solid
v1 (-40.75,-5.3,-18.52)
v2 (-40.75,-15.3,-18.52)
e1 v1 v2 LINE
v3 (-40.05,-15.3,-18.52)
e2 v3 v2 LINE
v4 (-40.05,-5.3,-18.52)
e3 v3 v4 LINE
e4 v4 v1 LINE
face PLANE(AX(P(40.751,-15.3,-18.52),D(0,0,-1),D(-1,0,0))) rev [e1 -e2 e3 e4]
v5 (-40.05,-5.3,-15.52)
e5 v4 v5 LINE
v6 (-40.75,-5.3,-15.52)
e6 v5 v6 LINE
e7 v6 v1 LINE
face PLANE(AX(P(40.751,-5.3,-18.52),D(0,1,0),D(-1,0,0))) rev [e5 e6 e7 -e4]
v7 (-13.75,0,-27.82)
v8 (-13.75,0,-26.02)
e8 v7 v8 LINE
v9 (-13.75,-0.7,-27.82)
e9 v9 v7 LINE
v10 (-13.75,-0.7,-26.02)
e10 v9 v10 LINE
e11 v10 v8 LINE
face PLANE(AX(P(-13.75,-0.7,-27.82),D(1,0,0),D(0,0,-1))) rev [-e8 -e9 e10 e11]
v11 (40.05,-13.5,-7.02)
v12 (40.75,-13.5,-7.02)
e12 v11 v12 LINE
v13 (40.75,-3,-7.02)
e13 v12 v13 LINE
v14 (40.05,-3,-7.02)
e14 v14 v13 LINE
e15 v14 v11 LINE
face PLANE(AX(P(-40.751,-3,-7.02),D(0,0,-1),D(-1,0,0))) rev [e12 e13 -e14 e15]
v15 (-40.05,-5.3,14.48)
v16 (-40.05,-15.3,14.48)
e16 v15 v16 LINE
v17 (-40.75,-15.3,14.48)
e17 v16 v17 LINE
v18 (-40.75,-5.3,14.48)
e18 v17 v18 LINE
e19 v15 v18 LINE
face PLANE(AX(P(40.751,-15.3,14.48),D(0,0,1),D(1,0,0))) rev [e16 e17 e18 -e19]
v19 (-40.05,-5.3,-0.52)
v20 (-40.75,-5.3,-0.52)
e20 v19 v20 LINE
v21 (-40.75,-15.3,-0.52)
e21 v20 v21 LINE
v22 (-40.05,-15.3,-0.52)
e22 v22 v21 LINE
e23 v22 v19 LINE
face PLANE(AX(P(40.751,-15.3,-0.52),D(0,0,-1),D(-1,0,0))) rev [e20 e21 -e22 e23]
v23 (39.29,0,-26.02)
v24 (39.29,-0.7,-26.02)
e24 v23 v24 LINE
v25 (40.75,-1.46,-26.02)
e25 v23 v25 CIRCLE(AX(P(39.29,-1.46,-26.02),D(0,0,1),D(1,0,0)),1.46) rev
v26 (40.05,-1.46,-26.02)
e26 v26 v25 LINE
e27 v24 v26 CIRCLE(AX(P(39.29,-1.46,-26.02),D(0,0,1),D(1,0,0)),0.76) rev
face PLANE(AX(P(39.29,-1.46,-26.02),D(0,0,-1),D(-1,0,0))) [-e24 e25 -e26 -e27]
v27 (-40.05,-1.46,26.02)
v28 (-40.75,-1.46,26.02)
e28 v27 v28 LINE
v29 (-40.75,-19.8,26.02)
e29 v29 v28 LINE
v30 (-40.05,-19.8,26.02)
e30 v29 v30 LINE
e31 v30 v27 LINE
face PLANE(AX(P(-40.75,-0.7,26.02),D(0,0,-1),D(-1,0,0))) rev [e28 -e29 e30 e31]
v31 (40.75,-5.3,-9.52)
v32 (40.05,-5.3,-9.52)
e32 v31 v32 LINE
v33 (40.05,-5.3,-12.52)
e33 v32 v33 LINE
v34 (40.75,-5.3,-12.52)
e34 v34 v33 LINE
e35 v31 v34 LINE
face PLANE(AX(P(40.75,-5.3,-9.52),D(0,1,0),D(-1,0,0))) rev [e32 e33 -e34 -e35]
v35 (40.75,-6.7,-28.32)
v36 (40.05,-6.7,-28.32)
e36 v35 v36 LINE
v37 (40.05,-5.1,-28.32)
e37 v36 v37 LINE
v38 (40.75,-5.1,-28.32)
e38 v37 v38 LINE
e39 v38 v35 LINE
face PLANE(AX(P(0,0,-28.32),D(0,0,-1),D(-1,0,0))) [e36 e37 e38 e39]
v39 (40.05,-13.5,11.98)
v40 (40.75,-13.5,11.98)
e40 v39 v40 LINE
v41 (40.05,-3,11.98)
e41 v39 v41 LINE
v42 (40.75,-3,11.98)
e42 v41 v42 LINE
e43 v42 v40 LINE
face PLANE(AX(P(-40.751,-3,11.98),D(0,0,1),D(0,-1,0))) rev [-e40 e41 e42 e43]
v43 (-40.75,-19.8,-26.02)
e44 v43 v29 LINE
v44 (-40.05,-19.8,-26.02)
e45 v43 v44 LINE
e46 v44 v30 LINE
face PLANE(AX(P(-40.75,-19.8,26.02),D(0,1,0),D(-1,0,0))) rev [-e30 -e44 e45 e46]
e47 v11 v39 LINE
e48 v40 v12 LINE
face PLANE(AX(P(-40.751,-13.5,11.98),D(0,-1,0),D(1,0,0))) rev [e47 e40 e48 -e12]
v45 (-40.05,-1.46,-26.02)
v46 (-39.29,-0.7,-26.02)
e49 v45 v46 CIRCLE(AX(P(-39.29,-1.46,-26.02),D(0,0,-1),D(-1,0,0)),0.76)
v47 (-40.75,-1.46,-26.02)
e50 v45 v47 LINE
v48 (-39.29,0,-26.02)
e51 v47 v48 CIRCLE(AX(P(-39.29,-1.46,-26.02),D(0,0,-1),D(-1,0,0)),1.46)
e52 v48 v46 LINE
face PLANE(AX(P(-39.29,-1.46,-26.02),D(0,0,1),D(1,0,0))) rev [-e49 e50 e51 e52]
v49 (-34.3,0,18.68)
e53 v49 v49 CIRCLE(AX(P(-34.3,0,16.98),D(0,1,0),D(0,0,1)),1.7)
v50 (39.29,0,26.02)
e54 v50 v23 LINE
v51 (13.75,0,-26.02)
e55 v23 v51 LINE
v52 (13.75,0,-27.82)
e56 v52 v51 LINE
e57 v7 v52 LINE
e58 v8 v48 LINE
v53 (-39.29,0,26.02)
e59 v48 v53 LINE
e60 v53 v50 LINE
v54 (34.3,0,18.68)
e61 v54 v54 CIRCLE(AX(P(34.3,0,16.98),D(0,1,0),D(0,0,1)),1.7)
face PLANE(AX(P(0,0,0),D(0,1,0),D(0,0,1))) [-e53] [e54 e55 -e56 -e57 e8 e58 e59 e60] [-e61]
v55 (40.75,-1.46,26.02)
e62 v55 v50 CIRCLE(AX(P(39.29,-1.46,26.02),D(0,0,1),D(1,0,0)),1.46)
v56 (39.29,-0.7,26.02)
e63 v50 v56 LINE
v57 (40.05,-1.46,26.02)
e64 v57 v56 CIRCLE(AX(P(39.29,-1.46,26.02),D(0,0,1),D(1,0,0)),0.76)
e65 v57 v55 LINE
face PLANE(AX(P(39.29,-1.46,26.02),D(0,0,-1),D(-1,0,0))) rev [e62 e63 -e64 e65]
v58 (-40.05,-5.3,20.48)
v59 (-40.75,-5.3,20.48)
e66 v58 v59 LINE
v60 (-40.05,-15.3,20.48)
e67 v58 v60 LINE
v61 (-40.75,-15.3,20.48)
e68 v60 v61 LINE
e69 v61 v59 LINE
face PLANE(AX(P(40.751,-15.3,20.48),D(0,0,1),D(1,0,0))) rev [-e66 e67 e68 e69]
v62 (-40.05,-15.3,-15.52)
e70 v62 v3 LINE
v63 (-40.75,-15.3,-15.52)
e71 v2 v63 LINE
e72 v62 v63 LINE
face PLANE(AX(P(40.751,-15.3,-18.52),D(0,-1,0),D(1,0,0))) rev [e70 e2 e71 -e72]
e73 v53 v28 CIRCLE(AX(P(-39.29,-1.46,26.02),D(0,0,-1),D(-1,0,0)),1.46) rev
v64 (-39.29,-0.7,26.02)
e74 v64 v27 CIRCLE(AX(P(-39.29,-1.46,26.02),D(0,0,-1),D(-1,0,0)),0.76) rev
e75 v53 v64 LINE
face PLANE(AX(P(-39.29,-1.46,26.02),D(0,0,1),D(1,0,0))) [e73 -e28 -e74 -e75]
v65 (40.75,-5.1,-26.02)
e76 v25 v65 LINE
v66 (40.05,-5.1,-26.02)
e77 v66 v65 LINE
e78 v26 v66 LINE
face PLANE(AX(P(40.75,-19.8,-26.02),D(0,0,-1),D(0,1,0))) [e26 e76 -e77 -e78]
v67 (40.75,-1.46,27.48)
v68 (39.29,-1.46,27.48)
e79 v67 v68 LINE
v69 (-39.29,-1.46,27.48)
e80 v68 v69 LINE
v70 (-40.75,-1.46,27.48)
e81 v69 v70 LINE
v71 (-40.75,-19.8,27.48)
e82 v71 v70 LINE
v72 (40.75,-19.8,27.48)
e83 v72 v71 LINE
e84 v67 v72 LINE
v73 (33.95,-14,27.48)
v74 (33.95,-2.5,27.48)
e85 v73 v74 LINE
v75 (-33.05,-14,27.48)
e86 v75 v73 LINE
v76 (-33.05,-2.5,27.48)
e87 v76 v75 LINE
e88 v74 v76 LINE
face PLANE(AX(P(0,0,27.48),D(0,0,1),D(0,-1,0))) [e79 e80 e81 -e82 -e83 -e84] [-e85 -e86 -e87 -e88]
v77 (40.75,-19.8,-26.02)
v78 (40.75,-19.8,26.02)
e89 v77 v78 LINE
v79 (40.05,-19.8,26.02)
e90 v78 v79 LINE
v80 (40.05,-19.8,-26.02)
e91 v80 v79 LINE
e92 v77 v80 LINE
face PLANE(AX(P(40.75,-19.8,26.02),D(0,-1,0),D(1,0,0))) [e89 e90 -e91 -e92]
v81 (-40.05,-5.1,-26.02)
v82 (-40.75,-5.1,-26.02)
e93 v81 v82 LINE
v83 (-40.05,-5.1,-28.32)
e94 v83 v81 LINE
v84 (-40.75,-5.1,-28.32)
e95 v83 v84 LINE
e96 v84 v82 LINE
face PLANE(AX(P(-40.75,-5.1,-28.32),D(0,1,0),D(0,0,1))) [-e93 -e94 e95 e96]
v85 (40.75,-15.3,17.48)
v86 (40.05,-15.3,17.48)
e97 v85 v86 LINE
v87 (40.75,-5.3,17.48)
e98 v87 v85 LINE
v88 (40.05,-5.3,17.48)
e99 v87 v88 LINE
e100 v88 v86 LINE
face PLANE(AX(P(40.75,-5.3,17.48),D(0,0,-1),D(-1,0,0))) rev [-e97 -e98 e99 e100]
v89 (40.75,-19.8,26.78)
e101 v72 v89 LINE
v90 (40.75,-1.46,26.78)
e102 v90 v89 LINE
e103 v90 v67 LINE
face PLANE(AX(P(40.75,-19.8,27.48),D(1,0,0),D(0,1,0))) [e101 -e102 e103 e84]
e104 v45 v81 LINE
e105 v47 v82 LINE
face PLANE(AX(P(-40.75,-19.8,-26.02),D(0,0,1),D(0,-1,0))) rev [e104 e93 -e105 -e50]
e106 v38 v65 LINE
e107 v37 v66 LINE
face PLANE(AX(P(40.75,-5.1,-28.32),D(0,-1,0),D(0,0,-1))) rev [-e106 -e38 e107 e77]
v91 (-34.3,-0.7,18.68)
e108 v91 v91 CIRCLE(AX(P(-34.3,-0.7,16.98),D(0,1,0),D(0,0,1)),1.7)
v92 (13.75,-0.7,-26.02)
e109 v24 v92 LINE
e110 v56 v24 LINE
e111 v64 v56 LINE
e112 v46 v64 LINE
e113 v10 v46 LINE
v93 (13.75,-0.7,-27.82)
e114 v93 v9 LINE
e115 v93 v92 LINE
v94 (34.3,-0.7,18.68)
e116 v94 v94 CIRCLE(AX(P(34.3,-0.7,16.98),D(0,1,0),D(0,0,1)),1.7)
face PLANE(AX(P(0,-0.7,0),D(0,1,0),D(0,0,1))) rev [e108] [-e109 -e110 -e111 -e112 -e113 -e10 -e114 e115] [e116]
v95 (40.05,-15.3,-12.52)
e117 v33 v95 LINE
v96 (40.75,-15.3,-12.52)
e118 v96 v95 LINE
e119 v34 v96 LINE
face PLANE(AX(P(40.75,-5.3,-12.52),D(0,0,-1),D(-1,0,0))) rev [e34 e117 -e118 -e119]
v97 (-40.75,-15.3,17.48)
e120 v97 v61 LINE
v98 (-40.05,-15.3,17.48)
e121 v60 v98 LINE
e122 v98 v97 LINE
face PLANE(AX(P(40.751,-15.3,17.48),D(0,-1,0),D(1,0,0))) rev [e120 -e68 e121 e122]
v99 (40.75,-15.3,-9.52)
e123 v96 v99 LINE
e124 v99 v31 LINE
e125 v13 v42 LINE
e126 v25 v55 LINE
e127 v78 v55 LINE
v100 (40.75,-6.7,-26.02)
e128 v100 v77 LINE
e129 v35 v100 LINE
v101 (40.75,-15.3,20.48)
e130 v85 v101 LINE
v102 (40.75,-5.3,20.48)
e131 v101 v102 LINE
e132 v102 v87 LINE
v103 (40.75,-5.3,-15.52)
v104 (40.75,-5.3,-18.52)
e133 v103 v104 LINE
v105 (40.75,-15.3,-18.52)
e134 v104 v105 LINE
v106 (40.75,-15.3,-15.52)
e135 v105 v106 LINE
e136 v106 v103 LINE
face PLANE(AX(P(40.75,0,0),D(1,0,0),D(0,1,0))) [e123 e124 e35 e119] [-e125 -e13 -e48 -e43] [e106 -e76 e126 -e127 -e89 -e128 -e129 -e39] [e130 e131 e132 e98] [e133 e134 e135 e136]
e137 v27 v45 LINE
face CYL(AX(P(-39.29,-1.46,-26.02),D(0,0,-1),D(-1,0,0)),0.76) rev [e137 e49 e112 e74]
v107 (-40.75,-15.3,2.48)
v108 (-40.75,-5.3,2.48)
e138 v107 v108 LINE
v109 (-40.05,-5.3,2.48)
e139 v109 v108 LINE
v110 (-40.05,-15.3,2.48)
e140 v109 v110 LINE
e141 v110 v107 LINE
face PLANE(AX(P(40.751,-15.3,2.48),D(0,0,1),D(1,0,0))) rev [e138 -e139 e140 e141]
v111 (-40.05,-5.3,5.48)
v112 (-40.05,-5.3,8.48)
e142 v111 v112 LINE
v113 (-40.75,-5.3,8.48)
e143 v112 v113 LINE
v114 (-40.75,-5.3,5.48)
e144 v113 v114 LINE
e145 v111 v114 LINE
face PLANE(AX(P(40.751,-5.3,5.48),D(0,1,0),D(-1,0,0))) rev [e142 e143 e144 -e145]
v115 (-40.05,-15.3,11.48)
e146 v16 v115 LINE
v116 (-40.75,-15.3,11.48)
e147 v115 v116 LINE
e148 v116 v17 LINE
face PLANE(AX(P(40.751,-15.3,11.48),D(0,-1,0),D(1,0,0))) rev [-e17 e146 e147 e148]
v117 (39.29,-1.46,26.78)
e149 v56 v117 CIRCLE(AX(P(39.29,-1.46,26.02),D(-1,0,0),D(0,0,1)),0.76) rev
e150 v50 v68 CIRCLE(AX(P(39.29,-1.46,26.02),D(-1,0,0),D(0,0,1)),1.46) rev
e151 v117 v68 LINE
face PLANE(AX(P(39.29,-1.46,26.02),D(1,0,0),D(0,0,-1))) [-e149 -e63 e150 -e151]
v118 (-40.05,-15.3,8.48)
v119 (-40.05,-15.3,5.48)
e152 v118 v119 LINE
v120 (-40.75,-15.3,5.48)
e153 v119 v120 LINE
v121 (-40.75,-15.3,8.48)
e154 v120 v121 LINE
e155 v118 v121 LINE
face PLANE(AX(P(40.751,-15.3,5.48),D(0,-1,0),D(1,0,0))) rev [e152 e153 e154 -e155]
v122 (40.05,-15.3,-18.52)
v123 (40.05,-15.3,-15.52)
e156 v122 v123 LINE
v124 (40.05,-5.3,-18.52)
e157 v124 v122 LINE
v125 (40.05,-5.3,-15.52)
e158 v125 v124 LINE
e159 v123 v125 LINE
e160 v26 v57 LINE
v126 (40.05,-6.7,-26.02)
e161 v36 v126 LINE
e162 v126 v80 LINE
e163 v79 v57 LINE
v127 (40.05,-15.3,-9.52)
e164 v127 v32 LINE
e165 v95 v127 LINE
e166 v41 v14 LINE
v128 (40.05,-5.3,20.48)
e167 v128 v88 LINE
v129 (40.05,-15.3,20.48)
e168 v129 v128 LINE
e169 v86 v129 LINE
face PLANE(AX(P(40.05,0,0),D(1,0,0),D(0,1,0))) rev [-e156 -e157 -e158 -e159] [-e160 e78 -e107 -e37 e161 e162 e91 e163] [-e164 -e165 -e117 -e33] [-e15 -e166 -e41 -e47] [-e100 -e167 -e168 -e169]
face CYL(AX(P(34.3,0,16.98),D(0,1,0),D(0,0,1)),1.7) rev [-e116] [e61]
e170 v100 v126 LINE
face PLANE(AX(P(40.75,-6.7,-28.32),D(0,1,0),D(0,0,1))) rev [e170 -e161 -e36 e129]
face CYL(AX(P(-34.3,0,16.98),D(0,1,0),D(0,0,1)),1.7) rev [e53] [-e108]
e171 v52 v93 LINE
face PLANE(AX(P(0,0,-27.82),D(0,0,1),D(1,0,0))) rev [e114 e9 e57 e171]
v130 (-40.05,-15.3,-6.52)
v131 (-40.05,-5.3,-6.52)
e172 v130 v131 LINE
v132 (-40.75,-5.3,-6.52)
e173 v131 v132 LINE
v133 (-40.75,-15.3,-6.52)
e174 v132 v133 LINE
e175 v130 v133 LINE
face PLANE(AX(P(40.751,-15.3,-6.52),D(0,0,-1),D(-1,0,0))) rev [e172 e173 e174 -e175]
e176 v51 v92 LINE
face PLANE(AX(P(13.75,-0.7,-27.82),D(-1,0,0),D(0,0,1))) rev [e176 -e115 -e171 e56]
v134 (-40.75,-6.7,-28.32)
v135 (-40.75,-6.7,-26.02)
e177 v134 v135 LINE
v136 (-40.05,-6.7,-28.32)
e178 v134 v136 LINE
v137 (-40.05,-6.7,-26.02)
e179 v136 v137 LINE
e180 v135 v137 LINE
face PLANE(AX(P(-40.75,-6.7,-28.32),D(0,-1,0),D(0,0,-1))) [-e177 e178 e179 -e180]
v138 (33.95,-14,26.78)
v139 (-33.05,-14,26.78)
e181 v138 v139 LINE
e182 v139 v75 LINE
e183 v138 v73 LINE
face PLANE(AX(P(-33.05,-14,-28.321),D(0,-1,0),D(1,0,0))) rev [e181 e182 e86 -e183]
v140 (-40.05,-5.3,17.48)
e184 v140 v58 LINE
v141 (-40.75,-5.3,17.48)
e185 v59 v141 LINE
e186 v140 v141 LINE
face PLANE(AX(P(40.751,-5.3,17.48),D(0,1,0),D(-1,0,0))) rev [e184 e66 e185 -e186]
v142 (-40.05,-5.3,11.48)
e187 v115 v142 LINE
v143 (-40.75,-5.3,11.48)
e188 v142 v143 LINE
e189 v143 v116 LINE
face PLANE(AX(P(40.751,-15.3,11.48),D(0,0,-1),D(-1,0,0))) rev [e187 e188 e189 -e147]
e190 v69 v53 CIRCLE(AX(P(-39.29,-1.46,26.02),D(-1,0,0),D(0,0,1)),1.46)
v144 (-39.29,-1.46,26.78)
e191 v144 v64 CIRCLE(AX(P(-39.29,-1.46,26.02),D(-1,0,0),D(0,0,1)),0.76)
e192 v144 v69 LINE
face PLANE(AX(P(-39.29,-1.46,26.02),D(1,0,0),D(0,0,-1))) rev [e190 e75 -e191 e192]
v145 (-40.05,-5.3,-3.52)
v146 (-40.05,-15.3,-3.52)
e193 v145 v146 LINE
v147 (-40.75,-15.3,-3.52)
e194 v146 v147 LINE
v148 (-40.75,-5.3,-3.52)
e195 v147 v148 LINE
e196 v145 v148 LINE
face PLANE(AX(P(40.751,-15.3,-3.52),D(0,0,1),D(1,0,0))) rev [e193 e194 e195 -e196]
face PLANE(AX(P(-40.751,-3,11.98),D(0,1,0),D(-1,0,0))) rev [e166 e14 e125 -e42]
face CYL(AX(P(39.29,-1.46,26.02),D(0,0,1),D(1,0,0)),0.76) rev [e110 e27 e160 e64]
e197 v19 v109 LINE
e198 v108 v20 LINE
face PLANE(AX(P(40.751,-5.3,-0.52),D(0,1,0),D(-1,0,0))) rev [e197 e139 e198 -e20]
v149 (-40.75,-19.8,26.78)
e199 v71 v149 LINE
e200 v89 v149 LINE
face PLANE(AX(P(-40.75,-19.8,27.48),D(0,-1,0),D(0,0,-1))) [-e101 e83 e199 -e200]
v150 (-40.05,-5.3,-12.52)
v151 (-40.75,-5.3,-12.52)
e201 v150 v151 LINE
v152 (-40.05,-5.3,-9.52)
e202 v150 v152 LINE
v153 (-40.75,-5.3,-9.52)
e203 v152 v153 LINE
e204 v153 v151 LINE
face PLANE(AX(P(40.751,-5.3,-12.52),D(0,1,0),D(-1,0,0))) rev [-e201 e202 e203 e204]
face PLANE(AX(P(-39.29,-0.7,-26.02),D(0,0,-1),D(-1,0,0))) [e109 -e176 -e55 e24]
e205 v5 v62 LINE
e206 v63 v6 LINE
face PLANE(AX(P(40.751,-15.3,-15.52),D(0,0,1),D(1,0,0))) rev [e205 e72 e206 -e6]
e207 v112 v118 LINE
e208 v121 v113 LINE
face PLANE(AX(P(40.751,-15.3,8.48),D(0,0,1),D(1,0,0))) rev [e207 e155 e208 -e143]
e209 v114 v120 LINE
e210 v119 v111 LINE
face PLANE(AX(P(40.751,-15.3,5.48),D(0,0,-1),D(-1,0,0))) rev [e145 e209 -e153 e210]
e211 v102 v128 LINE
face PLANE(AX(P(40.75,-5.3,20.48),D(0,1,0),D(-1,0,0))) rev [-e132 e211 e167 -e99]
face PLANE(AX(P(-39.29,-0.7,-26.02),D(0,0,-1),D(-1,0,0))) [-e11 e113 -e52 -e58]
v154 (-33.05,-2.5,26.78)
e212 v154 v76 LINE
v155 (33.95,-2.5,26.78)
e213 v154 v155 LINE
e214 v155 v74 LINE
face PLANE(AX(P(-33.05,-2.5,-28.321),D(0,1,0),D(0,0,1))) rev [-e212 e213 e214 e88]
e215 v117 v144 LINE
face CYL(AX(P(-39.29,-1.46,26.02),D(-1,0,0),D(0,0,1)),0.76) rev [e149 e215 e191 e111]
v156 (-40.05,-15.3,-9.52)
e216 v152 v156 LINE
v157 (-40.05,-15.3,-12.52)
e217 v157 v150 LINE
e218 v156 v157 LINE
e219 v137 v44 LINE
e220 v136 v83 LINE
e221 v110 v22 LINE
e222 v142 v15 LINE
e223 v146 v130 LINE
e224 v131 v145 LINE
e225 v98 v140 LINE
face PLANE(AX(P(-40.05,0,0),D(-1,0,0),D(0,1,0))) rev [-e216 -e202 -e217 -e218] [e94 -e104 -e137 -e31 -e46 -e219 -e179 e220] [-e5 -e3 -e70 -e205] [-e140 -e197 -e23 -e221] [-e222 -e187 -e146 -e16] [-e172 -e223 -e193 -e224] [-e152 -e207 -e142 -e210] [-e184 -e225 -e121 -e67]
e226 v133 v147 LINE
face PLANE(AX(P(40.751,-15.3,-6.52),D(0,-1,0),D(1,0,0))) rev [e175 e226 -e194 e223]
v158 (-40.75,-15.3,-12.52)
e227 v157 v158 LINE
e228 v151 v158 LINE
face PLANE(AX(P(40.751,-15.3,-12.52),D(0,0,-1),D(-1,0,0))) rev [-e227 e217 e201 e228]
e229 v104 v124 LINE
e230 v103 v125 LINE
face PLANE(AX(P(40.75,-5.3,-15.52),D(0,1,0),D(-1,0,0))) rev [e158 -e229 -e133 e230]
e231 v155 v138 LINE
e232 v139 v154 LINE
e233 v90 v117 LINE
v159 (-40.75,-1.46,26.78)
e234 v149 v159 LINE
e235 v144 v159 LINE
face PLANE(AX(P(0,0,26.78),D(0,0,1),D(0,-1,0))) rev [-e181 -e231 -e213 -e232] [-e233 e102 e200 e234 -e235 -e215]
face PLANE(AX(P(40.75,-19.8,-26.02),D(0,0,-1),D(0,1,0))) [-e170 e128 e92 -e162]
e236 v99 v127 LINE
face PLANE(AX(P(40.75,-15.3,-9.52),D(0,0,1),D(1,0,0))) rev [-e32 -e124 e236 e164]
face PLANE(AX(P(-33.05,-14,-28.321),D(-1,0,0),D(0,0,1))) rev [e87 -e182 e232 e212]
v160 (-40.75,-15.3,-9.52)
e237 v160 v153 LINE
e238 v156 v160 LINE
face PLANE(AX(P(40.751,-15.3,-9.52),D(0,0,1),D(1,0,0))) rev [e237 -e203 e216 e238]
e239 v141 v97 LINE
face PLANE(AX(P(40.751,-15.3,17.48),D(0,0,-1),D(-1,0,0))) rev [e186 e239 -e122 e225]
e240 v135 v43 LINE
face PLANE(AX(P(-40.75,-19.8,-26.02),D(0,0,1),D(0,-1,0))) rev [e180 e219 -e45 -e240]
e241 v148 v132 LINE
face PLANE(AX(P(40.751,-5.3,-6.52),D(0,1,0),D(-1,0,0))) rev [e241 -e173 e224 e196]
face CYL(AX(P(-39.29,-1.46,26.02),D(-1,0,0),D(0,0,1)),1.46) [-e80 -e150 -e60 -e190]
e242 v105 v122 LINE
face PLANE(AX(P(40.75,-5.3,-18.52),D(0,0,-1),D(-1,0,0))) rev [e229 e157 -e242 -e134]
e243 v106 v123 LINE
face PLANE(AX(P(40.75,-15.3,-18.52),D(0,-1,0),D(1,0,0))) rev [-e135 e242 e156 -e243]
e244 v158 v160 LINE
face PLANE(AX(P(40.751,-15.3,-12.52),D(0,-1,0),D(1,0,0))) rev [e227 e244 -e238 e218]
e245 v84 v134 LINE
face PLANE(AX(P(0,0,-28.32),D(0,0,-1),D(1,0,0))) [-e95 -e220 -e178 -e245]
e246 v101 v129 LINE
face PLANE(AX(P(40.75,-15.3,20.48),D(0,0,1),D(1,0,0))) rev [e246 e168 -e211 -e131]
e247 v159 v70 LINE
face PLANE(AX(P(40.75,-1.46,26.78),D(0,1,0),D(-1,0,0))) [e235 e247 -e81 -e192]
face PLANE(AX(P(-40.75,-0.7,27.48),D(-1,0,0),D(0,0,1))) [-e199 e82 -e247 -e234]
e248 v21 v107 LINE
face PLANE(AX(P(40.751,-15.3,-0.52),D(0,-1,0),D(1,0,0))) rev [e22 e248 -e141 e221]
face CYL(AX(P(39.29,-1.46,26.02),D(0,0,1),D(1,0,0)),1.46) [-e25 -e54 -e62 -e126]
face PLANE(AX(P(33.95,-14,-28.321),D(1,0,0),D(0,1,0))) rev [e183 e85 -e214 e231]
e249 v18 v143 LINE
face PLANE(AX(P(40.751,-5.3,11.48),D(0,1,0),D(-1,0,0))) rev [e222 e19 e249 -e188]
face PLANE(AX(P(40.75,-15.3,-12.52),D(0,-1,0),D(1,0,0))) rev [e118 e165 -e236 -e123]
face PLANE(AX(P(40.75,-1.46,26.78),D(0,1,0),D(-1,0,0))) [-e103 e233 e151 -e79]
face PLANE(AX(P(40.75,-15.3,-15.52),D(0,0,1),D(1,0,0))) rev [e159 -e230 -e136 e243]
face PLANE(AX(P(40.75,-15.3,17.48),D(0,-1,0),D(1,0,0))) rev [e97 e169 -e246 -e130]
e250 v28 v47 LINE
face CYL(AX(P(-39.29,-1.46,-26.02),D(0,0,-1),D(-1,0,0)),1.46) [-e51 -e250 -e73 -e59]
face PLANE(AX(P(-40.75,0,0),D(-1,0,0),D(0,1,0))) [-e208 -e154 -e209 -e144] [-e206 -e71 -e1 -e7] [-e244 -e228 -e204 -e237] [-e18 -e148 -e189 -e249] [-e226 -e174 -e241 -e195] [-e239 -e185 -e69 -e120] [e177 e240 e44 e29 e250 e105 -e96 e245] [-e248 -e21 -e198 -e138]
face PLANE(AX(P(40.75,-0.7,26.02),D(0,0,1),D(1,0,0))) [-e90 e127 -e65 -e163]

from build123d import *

# Parameters (mm, degrees)
SKETCH1_W                = 78.58
SKETCH1_H                = 52.04
BOSS_EXTRUDE1_DEPTH      = 0.7
EDGE_FLANGE2_DEPTH       = 52.04
EDGE_FLANGE1_START       = -39.29
EDGE_FLANGE1_DEPTH       = 78.58
EDGE_FLANGE1_START_2     = -40.75
EDGE_FLANGE1_2_OUTLINE_W = 18.34
EDGE_FLANGE1_2_OUTLINE_H = 0.7
EDGE_FLANGE1_2_DEPTH     = 81.5
CUT_EXTRUDE1_REACH       = 90.258
SKETCH12_W               = 3
SKETCH12_H               = 10
LPATTERN1_COUNT          = 7
LPATTERN1_PITCH          = 6
SKETCH13_W               = 3
SKETCH13_H               = 10
CUT_EXTRUDE2_DEPTH       = 88.611816555
CUT_EXTRUDE3_REACH       = 90.258
SKETCH14_W               = 19
SKETCH14_H               = 10.5
SKETCH15_W               = 0.7
SKETCH15_H               = 1.6
BOSS_EXTRUDE2_DEPTH      = 2.3
CUT_EXTRUDE4_REACH       = 73.877
SKETCH16_W               = 67
SKETCH16_H               = 11.5
SKETCH17_W               = 27.5
SKETCH17_H               = 0.7
BOSS_EXTRUDE3_DEPTH      = 1.8
M3_CLEARANCE_HOLE2_D     = 3.4


# Read off the part's stored shape, not the designer's step: Edge-Flange1
# Sheet-metal steps are written as plain solids
with BuildPart() as part:
    # Sketch1 → Boss-Extrude1 (new body)
    with BuildSketch(Plane(origin=(0, 0, 0), x_dir=(1, 0, 0), z_dir=(0, 1, 0))):
        Rectangle(SKETCH1_W, SKETCH1_H)
    extrude(amount=-BOSS_EXTRUDE1_DEPTH)

    # Edge-Flange2 section (across the edge) → Edge-Flange2 (add)
    with BuildSketch(Plane(origin=(40.05, -0.7, -26.02), x_dir=(-1, 0, 0), z_dir=(0, 0, 1))):
        with BuildLine():
            Line((-0.7, 0.76), (-0.7, 19.1))
            Line((-0.7, 19.1), (0, 19.1))
            Line((0, 19.1), (0, 0.76))
            ThreePointArc((0, 0.76), (0.222598846, 0.222598846), (0.76, 0))
            Line((0.76, 0), (0.76, -0.7))
            ThreePointArc((0.76, -0.7), (-0.272375901, -0.272375901), (-0.7, 0.76))
        make_face()
    edge_flange2 = extrude(amount=EDGE_FLANGE2_DEPTH)

    # Mirror1: Edge-Flange2 across plane
    add(edge_flange2.mirror(Plane(origin=(0, 0, 0), x_dir=(0, 0, 1), z_dir=(1, 0, 0))))

    # Edge-Flange1 outline → Edge-Flange1 (add)
    with BuildSketch(Plane.YZ.offset(EDGE_FLANGE1_START)):
        with BuildLine():
            Line((-1.46, 27.48), (-19.8, 27.48))
            Line((-19.8, 27.48), (-19.8, 26.78))
            Line((-19.8, 26.78), (-1.46, 26.78))
            ThreePointArc((-1.46, 26.78), (-0.922598846, 26.557401154), (-0.7, 26.02))
            Line((-0.7, 26.02), (0, 26.02))
            ThreePointArc((0, 26.02), (-0.427624099, 27.052375901), (-1.46, 27.48))
        make_face()
    extrude(amount=EDGE_FLANGE1_DEPTH)

    # Edge-Flange1 2 outline → Edge-Flange1 2 (add)
    with BuildSketch(Plane.YZ.offset(EDGE_FLANGE1_START_2)):
        with Locations((-10.63, 27.13)):
            Rectangle(EDGE_FLANGE1_2_OUTLINE_W, EDGE_FLANGE1_2_OUTLINE_H)
    extrude(amount=EDGE_FLANGE1_2_DEPTH)

    # Sketch12 → Cut-Extrude1 (cut, up to next)
    with BuildSketch(Plane.ZY.offset(40.75), mode=Mode.PRIVATE) as cut_extrude1_sk1:
        with Locations((-17.02, -10.3)):
            Rectangle(SKETCH12_W, SKETCH12_H)
    cut_extrude1_tool1 = extrude(cut_extrude1_sk1.sketch, amount=-CUT_EXTRUDE1_REACH, mode=Mode.PRIVATE) & part.part
    cut_extrude1 = cut_extrude1_tool1.solids().sort_by_distance((-40.75, -10.3, -17.02))[0]
    add(cut_extrude1, mode=Mode.SUBTRACT)

    # LPattern1: Cut-Extrude1 ×7
    with Locations(*[(0, 0, i * LPATTERN1_PITCH) for i in range(1, LPATTERN1_COUNT)]):
        add(cut_extrude1, mode=Mode.SUBTRACT)

    # Sketch13 → Cut-Extrude2 (cut, through all)
    with BuildSketch(Plane.ZY.offset(-40.05)):
        with Locations((18.98, -10.3)):
            Rectangle(SKETCH13_W, SKETCH13_H)
        with Locations((-11.02, -10.3)):
            Rectangle(SKETCH13_W, SKETCH13_H)
        with Locations((-17.02, -10.3)):
            Rectangle(SKETCH13_W, SKETCH13_H)
    extrude(amount=-CUT_EXTRUDE2_DEPTH, mode=Mode.SUBTRACT)

    # Sketch14 → Cut-Extrude3 (cut, up to next)
    with BuildSketch(Plane(origin=(40.75, 0, 0), x_dir=(0, 0, -1), z_dir=(1, 0, 0)), mode=Mode.PRIVATE) as cut_extrude3_sk1:
        with Locations((-2.48, -8.25)):
            Rectangle(SKETCH14_W, SKETCH14_H)
    cut_extrude3_tool1 = extrude(cut_extrude3_sk1.sketch, amount=-CUT_EXTRUDE3_REACH, mode=Mode.PRIVATE) & part.part
    add(cut_extrude3_tool1.solids().sort_by_distance((40.75, -8.25, 2.48))[0], mode=Mode.SUBTRACT)

    # Sketch15 → Boss-Extrude2 (add)
    with BuildSketch(Plane(origin=(0, 0, -26.02), x_dir=(-1, 0, 0), z_dir=(0, 0, -1))):
        with Locations((-40.4, -5.9)):
            Rectangle(SKETCH15_W, SKETCH15_H)
    boss_extrude2 = extrude(amount=BOSS_EXTRUDE2_DEPTH)

    # Mirror2: Boss-Extrude2 across plane
    add(boss_extrude2.mirror(Plane(origin=(0, 0, 0), x_dir=(0, 0, 1), z_dir=(1, 0, 0))))

    # Sketch16 → Cut-Extrude4 (cut, up to next)
    with BuildSketch(Plane.XY.offset(27.48), mode=Mode.PRIVATE) as cut_extrude4_sk1:
        with Locations((0.45, -8.25)):
            Rectangle(SKETCH16_W, SKETCH16_H)
    cut_extrude4_tool1 = extrude(cut_extrude4_sk1.sketch, amount=-CUT_EXTRUDE4_REACH, mode=Mode.PRIVATE) & part.part
    add(cut_extrude4_tool1.solids().sort_by_distance((0.45, -8.25, 27.48))[0], mode=Mode.SUBTRACT)

    # Sketch17 → Boss-Extrude3 (add)
    with BuildSketch(Plane(origin=(0, 0, -26.02), x_dir=(-1, 0, 0), z_dir=(0, 0, -1))):
        with Locations((0, -0.35)):
            Rectangle(SKETCH17_W, SKETCH17_H)
    extrude(amount=BOSS_EXTRUDE3_DEPTH)

    # M3 Clearance Hole2 (through all)
    with Locations(Plane(origin=(0, 0, 0), x_dir=(1, 0, 0), z_dir=(0, 1, 0))):
        with Locations((34.3, -16.98)):
            m3_clearance_hole2 = Hole(M3_CLEARANCE_HOLE2_D / 2)

    # Mirror3: M3 Clearance Hole2 across plane
    add(m3_clearance_hole2.mirror(Plane(origin=(0, 0, 0), x_dir=(0, 0, 1), z_dir=(1, 0, 0))), mode=Mode.SUBTRACT)


solid = part.part
